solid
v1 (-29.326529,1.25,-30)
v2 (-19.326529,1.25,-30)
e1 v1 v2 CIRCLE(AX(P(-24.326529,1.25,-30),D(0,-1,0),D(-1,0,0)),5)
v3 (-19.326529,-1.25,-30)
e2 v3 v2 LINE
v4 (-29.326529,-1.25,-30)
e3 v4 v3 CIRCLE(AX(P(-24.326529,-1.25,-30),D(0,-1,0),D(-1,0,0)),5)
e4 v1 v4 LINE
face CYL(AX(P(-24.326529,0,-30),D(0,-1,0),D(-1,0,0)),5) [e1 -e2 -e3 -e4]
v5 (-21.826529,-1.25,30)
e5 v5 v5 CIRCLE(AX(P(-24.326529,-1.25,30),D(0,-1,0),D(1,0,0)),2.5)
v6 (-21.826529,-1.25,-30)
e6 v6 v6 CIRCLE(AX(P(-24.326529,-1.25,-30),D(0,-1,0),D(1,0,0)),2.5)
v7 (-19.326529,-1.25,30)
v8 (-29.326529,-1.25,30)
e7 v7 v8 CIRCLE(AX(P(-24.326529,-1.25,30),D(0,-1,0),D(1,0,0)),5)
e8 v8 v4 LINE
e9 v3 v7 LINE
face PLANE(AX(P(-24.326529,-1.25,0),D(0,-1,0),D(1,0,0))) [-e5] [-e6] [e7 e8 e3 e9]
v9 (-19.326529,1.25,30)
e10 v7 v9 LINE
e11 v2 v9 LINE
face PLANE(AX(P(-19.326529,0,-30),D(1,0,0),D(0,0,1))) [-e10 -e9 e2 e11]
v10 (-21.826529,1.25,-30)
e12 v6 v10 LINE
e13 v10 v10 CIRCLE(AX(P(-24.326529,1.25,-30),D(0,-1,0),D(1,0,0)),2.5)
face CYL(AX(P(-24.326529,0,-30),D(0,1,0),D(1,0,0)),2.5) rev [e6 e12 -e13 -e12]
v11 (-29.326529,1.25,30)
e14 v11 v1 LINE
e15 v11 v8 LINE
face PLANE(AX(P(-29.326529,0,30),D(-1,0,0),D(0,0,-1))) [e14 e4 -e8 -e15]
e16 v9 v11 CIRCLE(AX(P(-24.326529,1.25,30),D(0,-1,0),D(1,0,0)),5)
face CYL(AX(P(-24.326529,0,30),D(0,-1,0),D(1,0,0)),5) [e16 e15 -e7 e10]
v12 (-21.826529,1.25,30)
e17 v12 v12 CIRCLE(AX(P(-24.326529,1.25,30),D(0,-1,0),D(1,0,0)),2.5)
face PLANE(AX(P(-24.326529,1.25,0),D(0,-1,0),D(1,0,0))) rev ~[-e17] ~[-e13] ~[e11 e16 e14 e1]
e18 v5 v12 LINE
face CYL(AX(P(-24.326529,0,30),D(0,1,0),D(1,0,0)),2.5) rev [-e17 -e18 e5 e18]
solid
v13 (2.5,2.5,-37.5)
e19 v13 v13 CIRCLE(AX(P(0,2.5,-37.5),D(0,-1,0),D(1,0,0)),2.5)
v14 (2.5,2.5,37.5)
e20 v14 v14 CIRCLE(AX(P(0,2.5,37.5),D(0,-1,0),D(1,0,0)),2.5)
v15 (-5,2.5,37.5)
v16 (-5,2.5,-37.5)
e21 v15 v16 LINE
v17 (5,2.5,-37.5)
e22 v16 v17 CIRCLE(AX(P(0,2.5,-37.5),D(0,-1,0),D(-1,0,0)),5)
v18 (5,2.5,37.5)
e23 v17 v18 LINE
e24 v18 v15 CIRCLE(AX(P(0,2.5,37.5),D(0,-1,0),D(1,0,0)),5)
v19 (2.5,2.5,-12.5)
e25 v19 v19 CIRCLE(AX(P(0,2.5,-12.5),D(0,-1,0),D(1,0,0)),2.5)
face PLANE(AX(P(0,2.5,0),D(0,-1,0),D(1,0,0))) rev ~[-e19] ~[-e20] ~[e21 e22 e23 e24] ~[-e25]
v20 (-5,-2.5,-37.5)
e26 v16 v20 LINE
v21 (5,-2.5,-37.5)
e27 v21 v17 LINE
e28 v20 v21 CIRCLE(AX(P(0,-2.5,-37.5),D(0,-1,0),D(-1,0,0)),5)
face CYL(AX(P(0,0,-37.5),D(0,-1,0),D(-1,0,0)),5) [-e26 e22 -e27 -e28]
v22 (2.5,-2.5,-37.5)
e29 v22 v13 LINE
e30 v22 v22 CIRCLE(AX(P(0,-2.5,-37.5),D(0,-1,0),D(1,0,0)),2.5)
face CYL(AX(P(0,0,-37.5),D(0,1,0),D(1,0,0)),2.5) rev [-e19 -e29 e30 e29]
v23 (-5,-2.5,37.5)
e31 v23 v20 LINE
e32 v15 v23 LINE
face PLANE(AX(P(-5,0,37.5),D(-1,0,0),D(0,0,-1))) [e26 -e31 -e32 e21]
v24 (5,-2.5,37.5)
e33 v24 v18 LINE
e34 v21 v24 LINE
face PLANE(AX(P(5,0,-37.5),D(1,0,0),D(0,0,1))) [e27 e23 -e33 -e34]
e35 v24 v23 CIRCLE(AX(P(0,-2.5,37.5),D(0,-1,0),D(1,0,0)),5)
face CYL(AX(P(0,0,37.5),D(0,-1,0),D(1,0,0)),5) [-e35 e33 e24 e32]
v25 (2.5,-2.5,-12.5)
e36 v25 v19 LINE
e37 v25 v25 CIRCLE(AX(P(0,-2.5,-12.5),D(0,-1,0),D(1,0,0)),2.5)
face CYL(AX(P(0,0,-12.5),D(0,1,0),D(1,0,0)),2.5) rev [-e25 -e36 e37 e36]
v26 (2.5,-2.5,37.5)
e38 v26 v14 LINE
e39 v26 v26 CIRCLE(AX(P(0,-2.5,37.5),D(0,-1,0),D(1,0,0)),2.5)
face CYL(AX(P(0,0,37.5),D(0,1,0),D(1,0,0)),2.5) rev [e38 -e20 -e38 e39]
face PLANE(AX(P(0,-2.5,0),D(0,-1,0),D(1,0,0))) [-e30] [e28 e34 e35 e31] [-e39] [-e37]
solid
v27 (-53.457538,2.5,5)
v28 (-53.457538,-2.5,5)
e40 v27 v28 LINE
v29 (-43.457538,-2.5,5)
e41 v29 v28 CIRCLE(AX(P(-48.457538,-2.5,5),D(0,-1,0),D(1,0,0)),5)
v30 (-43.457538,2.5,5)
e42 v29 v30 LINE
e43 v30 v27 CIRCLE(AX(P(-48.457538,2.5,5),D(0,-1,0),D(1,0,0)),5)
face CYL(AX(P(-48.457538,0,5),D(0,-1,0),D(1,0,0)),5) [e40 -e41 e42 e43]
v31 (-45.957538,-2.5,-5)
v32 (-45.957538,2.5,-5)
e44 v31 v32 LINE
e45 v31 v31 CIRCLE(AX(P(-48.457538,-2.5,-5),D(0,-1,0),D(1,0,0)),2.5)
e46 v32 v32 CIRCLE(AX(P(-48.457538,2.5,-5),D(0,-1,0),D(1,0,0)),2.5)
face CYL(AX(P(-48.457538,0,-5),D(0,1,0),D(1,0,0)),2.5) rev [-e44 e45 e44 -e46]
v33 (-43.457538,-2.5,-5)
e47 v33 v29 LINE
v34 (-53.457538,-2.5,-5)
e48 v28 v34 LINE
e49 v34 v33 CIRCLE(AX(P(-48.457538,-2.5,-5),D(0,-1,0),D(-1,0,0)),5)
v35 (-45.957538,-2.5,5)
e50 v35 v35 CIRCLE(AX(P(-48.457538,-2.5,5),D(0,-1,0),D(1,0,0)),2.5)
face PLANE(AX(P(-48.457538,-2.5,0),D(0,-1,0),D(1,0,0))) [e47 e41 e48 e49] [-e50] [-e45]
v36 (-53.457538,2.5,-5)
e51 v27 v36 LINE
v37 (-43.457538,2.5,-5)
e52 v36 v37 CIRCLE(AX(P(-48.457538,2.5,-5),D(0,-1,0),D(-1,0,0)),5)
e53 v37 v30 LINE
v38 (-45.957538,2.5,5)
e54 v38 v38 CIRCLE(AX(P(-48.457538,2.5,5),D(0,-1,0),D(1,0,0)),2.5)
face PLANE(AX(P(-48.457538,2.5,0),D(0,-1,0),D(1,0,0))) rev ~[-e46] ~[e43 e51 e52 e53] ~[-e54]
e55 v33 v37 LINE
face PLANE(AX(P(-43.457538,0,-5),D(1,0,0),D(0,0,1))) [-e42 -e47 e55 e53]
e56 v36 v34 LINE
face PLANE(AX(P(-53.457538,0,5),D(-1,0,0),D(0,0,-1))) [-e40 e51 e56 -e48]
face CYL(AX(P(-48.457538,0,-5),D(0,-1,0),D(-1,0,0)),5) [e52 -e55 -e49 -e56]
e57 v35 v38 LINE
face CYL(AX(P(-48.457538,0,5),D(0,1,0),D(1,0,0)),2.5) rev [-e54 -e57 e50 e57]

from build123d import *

# Parameters (mm, degrees)
F0_R     = 2.5
F1_DEPTH = 2.5
F2_R     = 2.5
F3_DEPTH = 1.25
F4_R     = 2.5
F5_DEPTH = 2.5


# Not quite as in the source:
# - a feature names something its author has since deleted; it is built from what else it names


with BuildPart() as f1:
    # F0 (on Front) → F1 (new body, symmetric)
    with BuildSketch(Plane.XZ):
        with BuildLine():
            Line((5, 0), (5, 37.5))
            ThreePointArc((5, 37.5), (0, 42.5), (-5, 37.5))
            Line((-5, 37.5), (-5, 0))
            Line((-5, 0), (-5, -37.5))
            ThreePointArc((-5, -37.5), (0, -42.5), (5, -37.5))
            Line((5, -37.5), (5, 0))
        make_face()
        with Locations((0, -37.5)):
            Circle(F0_R, mode=Mode.SUBTRACT)
        with Locations((0, -12.5)):
            Circle(F0_R, mode=Mode.SUBTRACT)
        with Locations((0, 37.5)):
            Circle(F0_R, mode=Mode.SUBTRACT)
    extrude(amount=F1_DEPTH, both=True)


with BuildPart() as f3:
    # F2 (on Front) → F3 (new body, symmetric)
    with BuildSketch(Plane.XZ):
        with BuildLine():
            Line((-19.3265285343, 0), (-19.3265285343, 30))
            ThreePointArc((-19.3265285343, 30), (-24.3265285343, 35), (-29.3265285343, 30))
            Line((-29.3265285343, 30), (-29.3265285343, 0))
            Line((-29.3265285343, 0), (-29.3265285343, -30))
            ThreePointArc((-29.3265285343, -30), (-24.3265285343, -35), (-19.3265285343, -30))
            Line((-19.3265285343, -30), (-19.3265285343, 0))
        make_face()
        with Locations((-24.3265285343, -30)):
            Circle(F2_R, mode=Mode.SUBTRACT)
        with Locations((-24.3265285343, 30)):
            Circle(F2_R, mode=Mode.SUBTRACT)
    extrude(amount=F3_DEPTH, both=True)


with BuildPart() as f5:
    # F4 (on Front) → F5 (new body, symmetric)
    with BuildSketch(Plane.XZ):
        with BuildLine():
            Line((-43.4575378895, 0), (-43.4575378895, 5))
            ThreePointArc((-43.4575378895, 5), (-48.4575378895, 10), (-53.4575378895, 5))
            Line((-53.4575378895, 5), (-53.4575378895, 0))
            Line((-53.4575378895, 0), (-53.4575378895, -5))
            ThreePointArc((-53.4575378895, -5), (-48.4575378895, -10), (-43.4575378895, -5))
            Line((-43.4575378895, -5), (-43.4575378895, 0))
        make_face()
        with Locations((-48.4575378895, -5)):
            Circle(F4_R, mode=Mode.SUBTRACT)
        with Locations((-48.4575378895, 5)):
            Circle(F4_R, mode=Mode.SUBTRACT)
    extrude(amount=F5_DEPTH, both=True)


solid = Compound([f1.part, f3.part, f5.part])
